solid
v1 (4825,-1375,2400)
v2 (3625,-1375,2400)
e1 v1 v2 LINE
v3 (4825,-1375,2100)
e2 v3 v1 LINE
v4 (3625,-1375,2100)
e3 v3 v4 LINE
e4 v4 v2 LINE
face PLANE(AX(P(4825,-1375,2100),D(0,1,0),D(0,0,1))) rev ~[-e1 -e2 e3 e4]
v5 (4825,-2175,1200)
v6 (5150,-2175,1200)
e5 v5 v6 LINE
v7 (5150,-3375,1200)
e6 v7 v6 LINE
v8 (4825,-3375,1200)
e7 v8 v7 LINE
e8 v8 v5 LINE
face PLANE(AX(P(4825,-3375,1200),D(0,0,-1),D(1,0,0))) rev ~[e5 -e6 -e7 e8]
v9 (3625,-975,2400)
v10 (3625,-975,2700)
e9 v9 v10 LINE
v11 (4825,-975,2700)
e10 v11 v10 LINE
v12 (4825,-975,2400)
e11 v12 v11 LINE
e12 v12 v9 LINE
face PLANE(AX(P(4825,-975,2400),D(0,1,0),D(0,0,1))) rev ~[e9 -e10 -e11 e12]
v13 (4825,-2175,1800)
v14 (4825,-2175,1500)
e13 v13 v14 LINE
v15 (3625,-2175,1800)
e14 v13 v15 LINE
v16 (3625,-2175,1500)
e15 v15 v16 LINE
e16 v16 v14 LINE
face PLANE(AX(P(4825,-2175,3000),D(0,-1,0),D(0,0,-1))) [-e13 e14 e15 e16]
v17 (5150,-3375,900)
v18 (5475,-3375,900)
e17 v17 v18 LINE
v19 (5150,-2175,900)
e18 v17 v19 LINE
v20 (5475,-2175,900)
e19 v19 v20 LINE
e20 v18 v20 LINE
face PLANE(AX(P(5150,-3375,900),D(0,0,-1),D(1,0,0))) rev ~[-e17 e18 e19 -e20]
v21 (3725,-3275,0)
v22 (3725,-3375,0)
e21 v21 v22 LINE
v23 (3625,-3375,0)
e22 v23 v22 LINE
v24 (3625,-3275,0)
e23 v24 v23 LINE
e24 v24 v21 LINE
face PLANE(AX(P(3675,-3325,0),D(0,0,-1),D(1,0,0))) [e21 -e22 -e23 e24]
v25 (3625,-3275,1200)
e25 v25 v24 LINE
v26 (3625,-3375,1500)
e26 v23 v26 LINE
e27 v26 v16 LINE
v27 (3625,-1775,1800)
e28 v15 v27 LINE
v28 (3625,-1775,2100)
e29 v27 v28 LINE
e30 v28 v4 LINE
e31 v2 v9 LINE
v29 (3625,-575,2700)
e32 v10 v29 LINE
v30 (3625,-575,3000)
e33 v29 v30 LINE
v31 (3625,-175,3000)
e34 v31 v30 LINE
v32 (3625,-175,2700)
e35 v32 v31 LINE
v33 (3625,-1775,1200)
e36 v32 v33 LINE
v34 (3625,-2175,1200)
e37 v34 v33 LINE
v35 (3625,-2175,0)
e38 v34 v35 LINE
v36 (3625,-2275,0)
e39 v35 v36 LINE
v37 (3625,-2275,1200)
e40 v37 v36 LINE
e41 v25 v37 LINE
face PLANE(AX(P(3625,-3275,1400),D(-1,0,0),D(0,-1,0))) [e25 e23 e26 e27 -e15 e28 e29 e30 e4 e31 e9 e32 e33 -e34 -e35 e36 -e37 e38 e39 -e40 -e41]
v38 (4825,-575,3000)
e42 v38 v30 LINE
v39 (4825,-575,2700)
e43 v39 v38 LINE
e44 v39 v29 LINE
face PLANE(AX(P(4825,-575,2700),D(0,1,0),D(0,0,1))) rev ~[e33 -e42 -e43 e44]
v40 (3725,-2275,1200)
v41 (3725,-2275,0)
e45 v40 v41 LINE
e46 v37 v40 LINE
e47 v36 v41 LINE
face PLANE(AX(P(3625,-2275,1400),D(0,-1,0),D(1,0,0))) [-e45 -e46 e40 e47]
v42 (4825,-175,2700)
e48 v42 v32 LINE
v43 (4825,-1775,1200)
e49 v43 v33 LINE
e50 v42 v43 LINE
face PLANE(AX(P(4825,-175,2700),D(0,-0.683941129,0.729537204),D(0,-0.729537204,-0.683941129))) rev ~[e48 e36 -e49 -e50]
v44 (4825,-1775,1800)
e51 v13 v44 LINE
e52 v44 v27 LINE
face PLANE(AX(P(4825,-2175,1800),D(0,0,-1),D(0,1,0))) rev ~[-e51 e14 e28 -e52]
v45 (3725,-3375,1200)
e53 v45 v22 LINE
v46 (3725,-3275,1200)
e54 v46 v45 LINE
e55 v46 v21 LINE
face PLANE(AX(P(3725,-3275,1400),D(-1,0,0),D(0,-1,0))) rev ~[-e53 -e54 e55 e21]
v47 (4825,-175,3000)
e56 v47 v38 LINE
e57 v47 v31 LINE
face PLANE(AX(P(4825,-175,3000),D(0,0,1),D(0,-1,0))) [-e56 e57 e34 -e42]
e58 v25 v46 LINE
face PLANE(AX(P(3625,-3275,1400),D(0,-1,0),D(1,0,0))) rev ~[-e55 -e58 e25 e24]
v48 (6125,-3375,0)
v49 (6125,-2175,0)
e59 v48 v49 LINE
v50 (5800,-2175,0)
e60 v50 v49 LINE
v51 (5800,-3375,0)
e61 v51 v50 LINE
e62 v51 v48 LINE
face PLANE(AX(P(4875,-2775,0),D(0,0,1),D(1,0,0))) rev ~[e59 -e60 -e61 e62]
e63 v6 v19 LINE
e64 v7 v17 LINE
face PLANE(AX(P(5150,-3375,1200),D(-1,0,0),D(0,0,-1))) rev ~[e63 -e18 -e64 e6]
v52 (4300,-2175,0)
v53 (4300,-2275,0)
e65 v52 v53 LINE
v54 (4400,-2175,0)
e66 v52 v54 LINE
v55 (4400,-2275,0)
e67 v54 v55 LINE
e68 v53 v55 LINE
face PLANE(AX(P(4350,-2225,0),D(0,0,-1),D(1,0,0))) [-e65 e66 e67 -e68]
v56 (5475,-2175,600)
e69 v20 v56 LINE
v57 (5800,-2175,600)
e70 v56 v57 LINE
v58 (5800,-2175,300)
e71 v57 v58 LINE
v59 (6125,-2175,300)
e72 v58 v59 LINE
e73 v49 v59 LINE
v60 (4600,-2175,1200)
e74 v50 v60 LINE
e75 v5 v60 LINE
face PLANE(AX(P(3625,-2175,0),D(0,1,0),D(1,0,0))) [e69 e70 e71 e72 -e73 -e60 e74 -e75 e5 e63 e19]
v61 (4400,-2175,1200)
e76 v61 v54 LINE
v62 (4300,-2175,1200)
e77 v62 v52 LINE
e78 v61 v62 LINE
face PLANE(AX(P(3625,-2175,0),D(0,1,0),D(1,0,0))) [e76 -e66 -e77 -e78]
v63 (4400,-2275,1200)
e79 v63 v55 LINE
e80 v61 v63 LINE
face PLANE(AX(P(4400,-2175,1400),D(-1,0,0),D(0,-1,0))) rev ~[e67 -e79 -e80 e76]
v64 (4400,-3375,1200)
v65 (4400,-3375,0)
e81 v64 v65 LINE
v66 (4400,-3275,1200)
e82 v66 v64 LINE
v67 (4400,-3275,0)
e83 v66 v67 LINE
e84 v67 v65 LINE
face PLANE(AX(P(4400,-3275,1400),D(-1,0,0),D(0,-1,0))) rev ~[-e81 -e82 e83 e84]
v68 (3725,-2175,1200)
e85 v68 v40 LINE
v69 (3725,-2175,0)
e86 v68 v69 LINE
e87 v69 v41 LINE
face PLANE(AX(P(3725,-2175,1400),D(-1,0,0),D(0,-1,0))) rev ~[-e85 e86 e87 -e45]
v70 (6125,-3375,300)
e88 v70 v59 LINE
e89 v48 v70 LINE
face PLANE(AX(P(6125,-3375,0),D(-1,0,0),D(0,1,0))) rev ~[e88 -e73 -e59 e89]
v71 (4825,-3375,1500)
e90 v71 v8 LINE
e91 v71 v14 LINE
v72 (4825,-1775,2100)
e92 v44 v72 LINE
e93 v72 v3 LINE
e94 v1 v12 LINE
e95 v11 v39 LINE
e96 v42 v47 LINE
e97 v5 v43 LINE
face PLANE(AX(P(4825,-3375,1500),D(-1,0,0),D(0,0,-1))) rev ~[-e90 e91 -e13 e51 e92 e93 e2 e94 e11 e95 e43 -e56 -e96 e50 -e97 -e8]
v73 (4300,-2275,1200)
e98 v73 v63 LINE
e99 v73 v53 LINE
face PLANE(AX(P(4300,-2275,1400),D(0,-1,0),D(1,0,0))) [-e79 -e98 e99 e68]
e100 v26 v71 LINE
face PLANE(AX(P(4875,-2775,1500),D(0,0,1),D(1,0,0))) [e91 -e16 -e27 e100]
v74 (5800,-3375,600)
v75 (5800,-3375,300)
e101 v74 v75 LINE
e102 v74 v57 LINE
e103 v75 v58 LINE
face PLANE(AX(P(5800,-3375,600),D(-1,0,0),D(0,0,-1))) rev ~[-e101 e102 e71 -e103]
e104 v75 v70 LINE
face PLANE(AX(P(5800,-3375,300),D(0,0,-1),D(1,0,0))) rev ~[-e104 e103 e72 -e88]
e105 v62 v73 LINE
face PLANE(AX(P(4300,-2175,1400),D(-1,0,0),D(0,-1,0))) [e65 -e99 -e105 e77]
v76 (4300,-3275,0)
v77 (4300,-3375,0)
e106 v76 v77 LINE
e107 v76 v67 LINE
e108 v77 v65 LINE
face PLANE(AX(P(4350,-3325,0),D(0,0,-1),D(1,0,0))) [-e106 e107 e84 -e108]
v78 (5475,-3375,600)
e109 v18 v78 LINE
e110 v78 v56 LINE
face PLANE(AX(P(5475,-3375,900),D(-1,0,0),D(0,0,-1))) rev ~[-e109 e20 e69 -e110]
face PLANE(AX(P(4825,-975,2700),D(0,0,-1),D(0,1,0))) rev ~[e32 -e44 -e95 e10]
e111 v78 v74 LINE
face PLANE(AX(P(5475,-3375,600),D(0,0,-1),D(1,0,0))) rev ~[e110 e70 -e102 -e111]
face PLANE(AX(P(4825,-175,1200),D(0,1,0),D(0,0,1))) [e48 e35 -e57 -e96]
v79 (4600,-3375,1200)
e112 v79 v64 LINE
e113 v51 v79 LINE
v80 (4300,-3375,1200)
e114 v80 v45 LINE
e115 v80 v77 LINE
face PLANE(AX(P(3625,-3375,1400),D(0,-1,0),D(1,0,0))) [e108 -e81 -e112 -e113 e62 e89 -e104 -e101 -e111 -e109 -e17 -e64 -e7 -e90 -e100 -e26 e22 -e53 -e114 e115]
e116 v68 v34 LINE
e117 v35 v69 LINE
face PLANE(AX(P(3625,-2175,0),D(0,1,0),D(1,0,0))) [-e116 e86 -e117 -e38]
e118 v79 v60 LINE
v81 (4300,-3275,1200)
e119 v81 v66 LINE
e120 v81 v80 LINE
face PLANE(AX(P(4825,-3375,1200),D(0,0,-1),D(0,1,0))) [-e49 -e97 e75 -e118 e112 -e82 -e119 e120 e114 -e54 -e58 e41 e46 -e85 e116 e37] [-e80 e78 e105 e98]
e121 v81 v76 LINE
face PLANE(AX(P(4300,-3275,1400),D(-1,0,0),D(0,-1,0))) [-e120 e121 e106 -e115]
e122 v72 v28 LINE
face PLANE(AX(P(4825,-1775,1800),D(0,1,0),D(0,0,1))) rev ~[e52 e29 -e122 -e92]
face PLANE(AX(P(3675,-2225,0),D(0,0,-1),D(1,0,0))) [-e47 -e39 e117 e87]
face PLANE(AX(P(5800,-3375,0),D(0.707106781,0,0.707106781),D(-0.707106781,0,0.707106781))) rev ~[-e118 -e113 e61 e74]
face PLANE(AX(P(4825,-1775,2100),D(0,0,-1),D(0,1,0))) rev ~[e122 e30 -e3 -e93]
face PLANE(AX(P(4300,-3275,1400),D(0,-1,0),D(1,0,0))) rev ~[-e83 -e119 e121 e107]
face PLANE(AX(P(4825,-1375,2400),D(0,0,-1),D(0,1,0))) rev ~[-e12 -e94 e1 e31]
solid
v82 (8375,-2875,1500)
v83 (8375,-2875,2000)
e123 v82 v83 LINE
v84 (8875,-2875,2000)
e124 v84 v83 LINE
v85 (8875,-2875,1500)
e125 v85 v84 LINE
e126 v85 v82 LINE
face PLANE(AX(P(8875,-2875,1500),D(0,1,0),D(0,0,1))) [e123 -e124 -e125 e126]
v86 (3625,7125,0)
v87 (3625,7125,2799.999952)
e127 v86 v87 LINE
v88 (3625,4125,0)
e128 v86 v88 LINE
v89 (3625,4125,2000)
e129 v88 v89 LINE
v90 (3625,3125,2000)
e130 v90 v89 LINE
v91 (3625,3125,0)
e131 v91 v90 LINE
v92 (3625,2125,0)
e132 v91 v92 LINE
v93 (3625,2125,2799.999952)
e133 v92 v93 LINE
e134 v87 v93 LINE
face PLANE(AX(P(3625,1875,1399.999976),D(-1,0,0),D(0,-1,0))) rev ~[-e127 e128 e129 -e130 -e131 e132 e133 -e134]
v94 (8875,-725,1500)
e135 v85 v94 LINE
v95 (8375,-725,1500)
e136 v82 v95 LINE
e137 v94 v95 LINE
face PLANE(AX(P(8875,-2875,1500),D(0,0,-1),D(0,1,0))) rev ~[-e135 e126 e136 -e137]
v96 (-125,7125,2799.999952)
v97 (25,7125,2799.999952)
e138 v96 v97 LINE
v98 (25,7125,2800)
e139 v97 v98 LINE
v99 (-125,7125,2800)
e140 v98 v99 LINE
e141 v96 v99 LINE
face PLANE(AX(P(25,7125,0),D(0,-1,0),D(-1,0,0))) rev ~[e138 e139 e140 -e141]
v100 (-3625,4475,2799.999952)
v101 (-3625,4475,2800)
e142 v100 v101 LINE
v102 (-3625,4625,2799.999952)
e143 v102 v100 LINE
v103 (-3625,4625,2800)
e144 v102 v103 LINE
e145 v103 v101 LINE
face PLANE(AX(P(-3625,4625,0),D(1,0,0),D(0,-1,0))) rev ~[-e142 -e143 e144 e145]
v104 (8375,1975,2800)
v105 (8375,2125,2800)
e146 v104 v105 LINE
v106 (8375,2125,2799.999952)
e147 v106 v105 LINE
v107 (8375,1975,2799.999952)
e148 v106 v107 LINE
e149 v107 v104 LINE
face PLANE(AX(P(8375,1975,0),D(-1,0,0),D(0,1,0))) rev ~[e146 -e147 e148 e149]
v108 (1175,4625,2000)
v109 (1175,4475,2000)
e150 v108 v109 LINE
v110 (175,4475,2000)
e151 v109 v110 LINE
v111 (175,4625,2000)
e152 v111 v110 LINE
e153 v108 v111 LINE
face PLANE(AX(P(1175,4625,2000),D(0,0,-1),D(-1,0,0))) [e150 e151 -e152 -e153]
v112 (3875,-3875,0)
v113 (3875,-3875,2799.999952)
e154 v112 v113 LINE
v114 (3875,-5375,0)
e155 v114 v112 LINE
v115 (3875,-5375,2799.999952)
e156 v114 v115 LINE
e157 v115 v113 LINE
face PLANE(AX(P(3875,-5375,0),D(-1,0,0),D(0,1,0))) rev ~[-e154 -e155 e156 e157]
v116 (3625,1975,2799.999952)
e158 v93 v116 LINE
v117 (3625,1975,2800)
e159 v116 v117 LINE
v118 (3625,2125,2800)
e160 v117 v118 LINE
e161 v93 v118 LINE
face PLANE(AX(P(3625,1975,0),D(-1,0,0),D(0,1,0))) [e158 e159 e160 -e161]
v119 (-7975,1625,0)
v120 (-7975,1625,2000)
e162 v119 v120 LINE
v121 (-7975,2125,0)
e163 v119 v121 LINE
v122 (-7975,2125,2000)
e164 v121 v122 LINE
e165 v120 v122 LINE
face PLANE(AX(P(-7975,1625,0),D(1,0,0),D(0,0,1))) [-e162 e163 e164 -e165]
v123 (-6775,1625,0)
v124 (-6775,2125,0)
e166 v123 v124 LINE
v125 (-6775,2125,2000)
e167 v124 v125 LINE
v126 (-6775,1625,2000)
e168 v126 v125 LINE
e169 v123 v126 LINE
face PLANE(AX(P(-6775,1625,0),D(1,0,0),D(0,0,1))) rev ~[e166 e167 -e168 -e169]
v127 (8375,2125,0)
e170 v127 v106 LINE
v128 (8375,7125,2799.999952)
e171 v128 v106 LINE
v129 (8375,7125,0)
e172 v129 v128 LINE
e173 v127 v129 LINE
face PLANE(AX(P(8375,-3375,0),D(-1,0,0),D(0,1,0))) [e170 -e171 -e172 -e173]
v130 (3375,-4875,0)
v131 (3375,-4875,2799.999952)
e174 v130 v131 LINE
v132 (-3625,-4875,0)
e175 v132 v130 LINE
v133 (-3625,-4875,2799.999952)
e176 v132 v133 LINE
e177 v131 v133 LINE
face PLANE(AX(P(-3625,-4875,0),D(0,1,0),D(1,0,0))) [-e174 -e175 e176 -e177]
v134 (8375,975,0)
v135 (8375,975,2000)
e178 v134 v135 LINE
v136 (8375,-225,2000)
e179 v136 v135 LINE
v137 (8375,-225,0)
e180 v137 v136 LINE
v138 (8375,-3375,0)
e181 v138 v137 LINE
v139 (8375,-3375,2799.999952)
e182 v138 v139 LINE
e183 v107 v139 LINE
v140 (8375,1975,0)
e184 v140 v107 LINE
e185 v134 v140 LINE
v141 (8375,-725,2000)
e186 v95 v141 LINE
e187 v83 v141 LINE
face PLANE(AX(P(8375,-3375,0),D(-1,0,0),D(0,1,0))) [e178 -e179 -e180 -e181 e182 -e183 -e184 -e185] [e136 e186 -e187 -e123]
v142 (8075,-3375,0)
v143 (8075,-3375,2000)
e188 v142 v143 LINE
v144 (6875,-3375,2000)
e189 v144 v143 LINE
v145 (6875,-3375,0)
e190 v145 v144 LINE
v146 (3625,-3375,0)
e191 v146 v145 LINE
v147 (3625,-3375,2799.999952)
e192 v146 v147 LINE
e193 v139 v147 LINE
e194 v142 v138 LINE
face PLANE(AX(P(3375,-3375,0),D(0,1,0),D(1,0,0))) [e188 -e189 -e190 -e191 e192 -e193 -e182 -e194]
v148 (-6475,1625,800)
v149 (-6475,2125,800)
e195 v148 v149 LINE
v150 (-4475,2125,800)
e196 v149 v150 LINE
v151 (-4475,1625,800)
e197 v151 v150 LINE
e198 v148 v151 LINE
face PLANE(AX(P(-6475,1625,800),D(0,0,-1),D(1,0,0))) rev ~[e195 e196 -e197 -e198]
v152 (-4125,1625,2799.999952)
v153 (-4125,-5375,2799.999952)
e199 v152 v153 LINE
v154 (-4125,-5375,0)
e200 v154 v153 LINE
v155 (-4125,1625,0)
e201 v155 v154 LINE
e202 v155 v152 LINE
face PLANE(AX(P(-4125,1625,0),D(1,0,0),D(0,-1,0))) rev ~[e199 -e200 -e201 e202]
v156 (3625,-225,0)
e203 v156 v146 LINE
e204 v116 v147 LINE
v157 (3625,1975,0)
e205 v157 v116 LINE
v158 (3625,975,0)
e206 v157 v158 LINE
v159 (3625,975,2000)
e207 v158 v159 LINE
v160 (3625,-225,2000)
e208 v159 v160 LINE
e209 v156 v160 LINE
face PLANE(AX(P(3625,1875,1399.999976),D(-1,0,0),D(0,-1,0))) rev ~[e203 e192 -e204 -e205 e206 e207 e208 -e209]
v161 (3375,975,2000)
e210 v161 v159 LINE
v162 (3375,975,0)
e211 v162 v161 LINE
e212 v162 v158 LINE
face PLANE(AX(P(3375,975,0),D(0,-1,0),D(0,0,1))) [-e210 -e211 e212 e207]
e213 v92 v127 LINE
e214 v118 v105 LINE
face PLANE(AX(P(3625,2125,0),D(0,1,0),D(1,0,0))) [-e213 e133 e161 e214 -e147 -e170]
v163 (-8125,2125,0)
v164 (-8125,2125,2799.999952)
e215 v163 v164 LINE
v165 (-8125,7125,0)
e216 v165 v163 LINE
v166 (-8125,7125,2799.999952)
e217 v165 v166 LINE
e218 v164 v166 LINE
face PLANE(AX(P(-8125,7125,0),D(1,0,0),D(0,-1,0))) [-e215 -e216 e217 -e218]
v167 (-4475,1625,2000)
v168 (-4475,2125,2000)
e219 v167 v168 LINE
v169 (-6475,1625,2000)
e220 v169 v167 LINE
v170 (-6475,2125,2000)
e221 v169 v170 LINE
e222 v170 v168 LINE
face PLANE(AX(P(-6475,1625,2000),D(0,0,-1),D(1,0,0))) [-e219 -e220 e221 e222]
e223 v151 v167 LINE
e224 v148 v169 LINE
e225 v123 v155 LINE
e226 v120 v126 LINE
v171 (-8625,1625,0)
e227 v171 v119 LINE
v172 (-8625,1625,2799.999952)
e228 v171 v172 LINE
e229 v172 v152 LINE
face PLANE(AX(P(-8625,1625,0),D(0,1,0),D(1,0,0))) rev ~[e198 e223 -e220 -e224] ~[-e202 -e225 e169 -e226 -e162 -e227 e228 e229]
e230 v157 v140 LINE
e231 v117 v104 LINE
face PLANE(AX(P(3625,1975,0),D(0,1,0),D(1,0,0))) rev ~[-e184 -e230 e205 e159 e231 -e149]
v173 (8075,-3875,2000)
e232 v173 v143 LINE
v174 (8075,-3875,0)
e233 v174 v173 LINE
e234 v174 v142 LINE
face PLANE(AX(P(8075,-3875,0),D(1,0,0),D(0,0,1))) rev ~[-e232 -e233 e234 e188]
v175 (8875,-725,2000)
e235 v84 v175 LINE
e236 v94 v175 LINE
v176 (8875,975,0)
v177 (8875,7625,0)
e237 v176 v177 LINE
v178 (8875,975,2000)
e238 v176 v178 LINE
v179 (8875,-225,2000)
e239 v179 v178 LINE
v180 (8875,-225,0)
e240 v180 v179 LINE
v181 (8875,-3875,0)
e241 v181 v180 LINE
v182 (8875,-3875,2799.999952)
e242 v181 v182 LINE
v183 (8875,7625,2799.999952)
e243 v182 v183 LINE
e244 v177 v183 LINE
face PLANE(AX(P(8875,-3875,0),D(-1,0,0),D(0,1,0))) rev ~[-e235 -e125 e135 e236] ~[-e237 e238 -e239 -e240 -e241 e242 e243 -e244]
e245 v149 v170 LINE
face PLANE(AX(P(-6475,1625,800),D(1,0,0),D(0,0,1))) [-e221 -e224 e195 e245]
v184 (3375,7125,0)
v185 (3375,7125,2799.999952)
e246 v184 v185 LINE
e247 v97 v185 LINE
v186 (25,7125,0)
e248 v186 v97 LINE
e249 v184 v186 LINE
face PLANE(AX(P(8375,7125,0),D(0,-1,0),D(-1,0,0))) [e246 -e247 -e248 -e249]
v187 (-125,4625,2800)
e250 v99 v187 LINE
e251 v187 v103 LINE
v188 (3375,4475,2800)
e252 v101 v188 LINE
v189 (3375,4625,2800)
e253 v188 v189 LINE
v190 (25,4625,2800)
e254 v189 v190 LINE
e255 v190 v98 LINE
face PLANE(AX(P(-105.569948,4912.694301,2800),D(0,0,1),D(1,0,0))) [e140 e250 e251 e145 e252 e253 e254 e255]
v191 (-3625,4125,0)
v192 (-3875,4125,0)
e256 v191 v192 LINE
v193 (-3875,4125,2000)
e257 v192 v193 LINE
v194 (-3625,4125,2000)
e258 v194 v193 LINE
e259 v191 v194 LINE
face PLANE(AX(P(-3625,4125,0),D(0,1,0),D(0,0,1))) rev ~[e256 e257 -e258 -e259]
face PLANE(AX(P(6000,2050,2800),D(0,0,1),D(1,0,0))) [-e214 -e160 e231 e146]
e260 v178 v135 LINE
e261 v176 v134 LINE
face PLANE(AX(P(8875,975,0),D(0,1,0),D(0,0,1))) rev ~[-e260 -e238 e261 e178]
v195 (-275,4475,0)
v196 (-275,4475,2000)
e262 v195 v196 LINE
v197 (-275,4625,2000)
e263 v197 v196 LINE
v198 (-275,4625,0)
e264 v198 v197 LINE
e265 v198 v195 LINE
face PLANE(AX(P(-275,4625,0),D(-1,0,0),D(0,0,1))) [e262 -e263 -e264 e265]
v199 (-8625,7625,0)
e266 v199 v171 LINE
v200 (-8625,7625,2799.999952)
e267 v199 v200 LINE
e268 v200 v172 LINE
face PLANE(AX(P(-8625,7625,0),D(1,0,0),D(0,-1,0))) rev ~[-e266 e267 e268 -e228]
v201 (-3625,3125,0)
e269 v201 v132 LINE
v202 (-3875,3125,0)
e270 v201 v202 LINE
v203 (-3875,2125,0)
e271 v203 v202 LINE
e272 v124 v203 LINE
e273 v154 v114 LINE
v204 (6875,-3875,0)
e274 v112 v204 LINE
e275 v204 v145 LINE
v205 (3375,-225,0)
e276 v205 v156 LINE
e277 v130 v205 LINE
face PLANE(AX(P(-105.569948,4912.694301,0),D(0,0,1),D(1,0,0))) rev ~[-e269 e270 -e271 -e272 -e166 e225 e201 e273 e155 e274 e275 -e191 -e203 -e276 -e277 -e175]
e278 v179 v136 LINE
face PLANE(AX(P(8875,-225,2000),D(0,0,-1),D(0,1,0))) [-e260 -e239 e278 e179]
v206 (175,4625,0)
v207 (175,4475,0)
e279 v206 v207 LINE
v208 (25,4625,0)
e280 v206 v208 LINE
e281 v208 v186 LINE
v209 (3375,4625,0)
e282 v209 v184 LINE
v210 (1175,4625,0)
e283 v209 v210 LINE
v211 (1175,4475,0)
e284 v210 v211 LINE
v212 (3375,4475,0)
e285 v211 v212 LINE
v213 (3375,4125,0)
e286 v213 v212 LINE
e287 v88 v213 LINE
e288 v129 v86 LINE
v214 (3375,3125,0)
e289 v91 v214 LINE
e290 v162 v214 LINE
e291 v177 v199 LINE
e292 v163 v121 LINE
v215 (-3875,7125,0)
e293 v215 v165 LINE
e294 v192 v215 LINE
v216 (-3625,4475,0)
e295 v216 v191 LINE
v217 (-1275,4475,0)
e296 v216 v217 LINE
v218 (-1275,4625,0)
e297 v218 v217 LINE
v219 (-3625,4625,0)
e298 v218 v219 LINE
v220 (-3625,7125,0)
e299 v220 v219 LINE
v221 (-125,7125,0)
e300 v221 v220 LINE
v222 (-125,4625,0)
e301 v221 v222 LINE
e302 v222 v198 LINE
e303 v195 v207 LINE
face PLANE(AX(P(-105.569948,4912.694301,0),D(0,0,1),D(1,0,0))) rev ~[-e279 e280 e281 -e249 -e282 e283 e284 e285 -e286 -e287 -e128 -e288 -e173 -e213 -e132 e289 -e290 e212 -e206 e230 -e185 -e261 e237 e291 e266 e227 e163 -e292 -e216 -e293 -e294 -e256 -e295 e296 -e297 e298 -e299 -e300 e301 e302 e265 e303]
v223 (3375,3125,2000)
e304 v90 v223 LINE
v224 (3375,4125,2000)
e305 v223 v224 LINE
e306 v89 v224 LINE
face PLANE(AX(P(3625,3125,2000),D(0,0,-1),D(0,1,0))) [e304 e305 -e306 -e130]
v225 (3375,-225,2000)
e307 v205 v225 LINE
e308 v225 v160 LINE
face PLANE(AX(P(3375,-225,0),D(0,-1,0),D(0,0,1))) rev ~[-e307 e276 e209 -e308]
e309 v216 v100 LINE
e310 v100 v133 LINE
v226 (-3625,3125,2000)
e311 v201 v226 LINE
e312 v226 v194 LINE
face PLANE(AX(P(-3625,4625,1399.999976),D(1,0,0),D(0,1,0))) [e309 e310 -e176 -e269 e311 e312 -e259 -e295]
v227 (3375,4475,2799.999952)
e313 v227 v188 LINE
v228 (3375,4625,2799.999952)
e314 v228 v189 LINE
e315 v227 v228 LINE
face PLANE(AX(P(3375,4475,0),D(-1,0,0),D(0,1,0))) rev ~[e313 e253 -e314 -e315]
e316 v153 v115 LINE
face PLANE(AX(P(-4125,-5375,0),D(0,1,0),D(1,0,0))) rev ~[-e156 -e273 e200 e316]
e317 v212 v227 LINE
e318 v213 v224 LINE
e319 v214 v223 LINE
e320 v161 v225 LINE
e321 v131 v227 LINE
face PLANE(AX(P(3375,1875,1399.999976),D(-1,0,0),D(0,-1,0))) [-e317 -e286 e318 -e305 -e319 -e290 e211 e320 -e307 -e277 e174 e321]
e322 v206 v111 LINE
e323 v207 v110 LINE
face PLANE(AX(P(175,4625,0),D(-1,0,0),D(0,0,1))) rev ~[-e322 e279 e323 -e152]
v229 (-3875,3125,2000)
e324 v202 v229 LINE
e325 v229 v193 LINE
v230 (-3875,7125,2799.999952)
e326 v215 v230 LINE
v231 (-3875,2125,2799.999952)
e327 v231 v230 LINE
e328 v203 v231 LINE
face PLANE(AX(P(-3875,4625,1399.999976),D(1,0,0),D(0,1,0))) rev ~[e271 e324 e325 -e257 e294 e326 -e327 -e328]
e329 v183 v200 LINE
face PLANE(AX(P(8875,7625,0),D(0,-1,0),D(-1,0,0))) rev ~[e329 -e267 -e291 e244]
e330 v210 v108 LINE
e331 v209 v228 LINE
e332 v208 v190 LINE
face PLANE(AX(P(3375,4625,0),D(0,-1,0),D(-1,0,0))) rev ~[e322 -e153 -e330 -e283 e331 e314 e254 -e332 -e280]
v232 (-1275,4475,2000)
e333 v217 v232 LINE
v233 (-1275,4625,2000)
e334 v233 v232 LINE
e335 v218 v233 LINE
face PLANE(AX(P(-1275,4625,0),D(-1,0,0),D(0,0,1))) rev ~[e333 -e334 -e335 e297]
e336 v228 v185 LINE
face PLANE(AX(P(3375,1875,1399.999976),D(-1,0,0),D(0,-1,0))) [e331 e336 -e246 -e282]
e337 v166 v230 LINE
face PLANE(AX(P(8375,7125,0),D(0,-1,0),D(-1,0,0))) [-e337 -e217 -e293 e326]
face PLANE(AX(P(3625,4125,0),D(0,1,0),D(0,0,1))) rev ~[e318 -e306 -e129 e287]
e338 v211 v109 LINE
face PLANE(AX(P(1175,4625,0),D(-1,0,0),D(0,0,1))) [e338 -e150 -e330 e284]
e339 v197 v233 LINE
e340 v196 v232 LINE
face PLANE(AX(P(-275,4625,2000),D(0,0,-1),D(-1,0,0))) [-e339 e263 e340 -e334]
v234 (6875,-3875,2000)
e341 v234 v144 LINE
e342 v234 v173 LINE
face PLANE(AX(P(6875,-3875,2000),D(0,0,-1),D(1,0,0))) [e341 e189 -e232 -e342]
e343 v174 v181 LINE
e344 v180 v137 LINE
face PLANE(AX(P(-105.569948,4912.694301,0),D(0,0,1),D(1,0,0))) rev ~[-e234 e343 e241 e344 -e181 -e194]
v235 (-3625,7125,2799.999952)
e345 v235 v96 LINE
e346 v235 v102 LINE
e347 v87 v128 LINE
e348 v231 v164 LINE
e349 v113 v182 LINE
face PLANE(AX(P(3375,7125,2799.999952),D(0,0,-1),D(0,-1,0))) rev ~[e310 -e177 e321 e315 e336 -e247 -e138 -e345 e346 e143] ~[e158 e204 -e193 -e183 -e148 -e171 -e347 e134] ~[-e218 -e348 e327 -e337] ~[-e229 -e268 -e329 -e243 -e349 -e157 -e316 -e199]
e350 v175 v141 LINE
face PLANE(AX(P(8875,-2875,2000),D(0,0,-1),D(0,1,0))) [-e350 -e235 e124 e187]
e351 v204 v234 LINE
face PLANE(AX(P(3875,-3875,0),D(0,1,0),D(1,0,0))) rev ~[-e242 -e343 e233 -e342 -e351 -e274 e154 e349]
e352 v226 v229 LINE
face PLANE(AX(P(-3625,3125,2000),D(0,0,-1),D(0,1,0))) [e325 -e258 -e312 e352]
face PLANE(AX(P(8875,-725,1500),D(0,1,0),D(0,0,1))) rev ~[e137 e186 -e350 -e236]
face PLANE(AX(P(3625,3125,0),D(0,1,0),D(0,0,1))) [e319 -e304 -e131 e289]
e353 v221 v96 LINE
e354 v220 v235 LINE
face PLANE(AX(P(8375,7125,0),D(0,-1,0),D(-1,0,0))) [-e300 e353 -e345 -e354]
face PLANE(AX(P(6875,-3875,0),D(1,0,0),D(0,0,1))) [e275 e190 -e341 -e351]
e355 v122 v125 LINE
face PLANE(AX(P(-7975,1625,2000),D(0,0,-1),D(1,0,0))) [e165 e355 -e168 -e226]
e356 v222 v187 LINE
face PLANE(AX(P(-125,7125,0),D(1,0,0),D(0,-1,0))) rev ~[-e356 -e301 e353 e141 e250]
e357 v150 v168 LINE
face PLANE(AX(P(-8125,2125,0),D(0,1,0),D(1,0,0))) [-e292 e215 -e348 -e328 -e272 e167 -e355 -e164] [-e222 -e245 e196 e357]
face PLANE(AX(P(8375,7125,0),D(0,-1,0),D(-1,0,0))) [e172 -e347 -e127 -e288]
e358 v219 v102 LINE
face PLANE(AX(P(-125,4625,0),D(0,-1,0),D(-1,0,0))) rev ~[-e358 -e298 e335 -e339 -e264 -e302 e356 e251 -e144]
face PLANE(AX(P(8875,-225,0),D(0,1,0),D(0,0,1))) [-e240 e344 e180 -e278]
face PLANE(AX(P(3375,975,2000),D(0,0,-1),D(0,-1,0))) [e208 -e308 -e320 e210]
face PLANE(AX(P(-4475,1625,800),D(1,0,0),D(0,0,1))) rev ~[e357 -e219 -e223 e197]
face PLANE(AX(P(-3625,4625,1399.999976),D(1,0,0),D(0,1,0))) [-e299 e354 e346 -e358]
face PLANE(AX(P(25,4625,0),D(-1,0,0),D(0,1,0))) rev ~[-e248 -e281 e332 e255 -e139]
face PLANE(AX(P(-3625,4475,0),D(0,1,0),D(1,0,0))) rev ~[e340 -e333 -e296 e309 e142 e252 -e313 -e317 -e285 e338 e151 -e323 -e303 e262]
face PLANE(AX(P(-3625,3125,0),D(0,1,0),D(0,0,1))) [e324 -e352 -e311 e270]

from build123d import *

# Parameters (mm, degrees)
F1_DEPTH  = 2799.9999523163
F3_DEPTH  = 3000
F4_W      = 5000
F4_H      = 2799.9999523163
F5_DEPTH  = 250
F6_W      = 1000
F6_H      = 2000
F7_DEPTH  = 250
F8_W      = 1200
F8_H      = 2000
F9_DEPTH  = 500
F10_W     = 2000
F10_H     = 1200
F11_DEPTH = 500
F12_W     = 10500
F12_H     = 2799.9999523163
F13_DEPTH = 250
F14_W     = 4750
F14_H     = 150
F15_DEPTH = 2800
F16_W     = 1000
F16_H     = 2000
F17_DEPTH = 150
F18_W     = 1000
F18_H     = 2000
F19_DEPTH = 150
F20_W     = 1000
F20_H     = 2000
F21_DEPTH = 250
F22_W     = 1200
F22_H     = 2000
F23_DEPTH = 500
F24_W     = 1200
F24_H     = 2000
F25_DEPTH = 500
F26_W     = 2150
F26_H     = 500
F27_DEPTH = 500
F28_W     = 1200
F28_H     = 2000
F29_DEPTH = 250
F30_W     = 2500
F30_H     = 1200
F31_DEPTH = 1500
F33_DEPTH = 1200
F34_W     = 100
F34_H     = 100
F35_DEPTH = 1400
F36_W     = 1200
F36_H     = 300
F37_DEPTH = 1200
F39_DEPTH = 1200


with BuildPart() as f1:
    # F0 (on Top) → F1 (new body)
    with BuildSketch(Plane.XY):
        Polygon((8875, -3875), (8875, 7625), (-8625, 7625), (-8625, 1625), (-4125, 1625), (-4125, -5375), (3875, -5375), (3875, -3875), align=None)
    extrude(amount=F1_DEPTH)

    # F2 (on Top) → F3 (cut)
    with BuildSketch(Plane.XY):
        Polygon((8375, -3375), (8375, 7125), (-3740.2497768402, 7125), (-8125, 7125), (-8125, 2125), (-3625, 2125), (-3625, -4875), (3375, -4875), (3375, -3375), align=None)
    extrude(amount=F3_DEPTH, mode=Mode.SUBTRACT)

    # F4 (on face) → F5 (join)
    with BuildSketch(Plane.YZ.offset(-3625)):
        with Locations((4625, 1399.9999761581)):
            Rectangle(F4_W, F4_H)
    extrude(amount=-F5_DEPTH)

    # F6 (on face) → F7 (cut, through all)
    with BuildSketch(Plane.YZ.offset(-3625)):
        with Locations((3625, 1000)):
            Rectangle(F6_W, F6_H)
    extrude(amount=-F7_DEPTH, mode=Mode.SUBTRACT)

    # F8 (on face) → F9 (cut, through all)
    with BuildSketch(Plane.XZ.offset(-1625)):
        with Locations((-7375, 1000)):
            Rectangle(F8_W, F8_H)
    extrude(amount=-F9_DEPTH, mode=Mode.SUBTRACT)

    # F10 (on face) → F11 (cut, through all)
    with BuildSketch(Plane.XZ.offset(-1625)):
        with Locations((-5475, 1400)):
            Rectangle(F10_W, F10_H)
    extrude(amount=-F11_DEPTH, mode=Mode.SUBTRACT)

    # F12 (on face) → F13 (join)
    with BuildSketch(Plane(origin=(3375, 0, 0), x_dir=(0, -1, 0), z_dir=(-1, 0, 0))):
        with Locations((-1875, 1399.9999761581)):
            Rectangle(F12_W, F12_H)
    extrude(amount=-F13_DEPTH)

    # F14 (on face) → F15 (join)
    with BuildSketch(Plane.XY):
        Polygon((3375, 4475), (3375, 4625), (25, 4625), (25, 7125), (-125, 7125), (-125, 4625), (-3625, 4625), (-3625, 4475), align=None)
        with Locations((6000, 2050)):
            Rectangle(F14_W, F14_H)
    extrude(amount=F15_DEPTH)

    # F16 (on face) → F17 (cut, through all)
    with BuildSketch(Plane(origin=(0, 4625, 0), x_dir=(-1, 0, 0), z_dir=(0, 1, 0))):
        with Locations((775, 1000)):
            Rectangle(F16_W, F16_H)
    extrude(amount=-F17_DEPTH, mode=Mode.SUBTRACT)

    # F18 (on face) → F19 (cut, through all)
    with BuildSketch(Plane(origin=(0, 4625, 0), x_dir=(-1, 0, 0), z_dir=(0, 1, 0))):
        with Locations((-675, 1000)):
            Rectangle(F18_W, F18_H)
    extrude(amount=-F19_DEPTH, mode=Mode.SUBTRACT)

    # F20 (on face) → F21 (cut, through all)
    with BuildSketch(Plane.YZ.offset(3625)):
        with Locations((3625, 1000)):
            Rectangle(F20_W, F20_H)
    extrude(amount=-F21_DEPTH, mode=Mode.SUBTRACT)

    # F22 (on face) → F23 (cut, through all)
    with BuildSketch(Plane.XZ.offset(3875)):
        with Locations((7475, 1000)):
            Rectangle(F22_W, F22_H)
    extrude(amount=-F23_DEPTH, mode=Mode.SUBTRACT)

    # F24 (on face) → F25 (cut, through all)
    with BuildSketch(Plane.YZ.offset(8875)):
        with Locations((375, 1000)):
            Rectangle(F24_W, F24_H)
    extrude(amount=-F25_DEPTH, mode=Mode.SUBTRACT)

    # F26 (on face) → F27 (cut, through all)
    with BuildSketch(Plane.YZ.offset(8875)):
        with Locations((-1800, 1750)):
            Rectangle(F26_W, F26_H)
    extrude(amount=-F27_DEPTH, mode=Mode.SUBTRACT)

    # F28 (on face) → F29 (cut, through all)
    with BuildSketch(Plane(origin=(3375, 0, 0), x_dir=(0, -1, 0), z_dir=(-1, 0, 0))):
        with Locations((-375, 1000)):
            Rectangle(F28_W, F28_H)
    extrude(amount=-F29_DEPTH, mode=Mode.SUBTRACT)


with BuildPart() as f31:
    # F30 (on face) → F31 (new body)
    with BuildSketch(Plane.XY):
        with Locations((4875, -2775)):
            Rectangle(F30_W, F30_H)
    extrude(amount=F31_DEPTH)

    # F32 (on face) → F33 (cut, through all)
    with BuildSketch(Plane.XZ.offset(3375)):
        Polygon((6125, 300), (6125, 1500), (4825, 1500), (4825, 1200), (5150, 1200), (5150, 900), (5475, 900), (5475, 600), (5800, 600), (5800, 300), align=None)
        Polygon((3625, 1400), (3625, 0), (5800, 0), (4400, 1400), align=None)
    extrude(amount=-F33_DEPTH, mode=Mode.SUBTRACT)

    # F34 (on face) → F35 (join)
    with BuildSketch(Plane(origin=(0, 0, 1400), x_dir=(1, 0, 0), z_dir=(0, 0, -1))):
        with Locations((3675, 3325)):
            Rectangle(F34_W, F34_H)
        with Locations((3675, 2225)):
            Rectangle(F34_W, F34_H)
        with Locations((4350, 2225)):
            Rectangle(F34_W, F34_H)
        with Locations((4350, 3325)):
            Rectangle(F34_W, F34_H)
    extrude(amount=F35_DEPTH)

    # F36 (on face) → F37 (join)
    with BuildSketch(Plane.YZ.offset(4825)):
        with Locations((-2775, 1350)):
            Rectangle(F36_W, F36_H)
        Polygon((-2175, 1500), (-2175, 1200), (-175, 1200), (-175, 3000), (-2175, 3000), align=None)
    extrude(amount=-F37_DEPTH)

    # F38 (on face) → F39 (cut)
    with BuildSketch(Plane.YZ.offset(4825)):
        Polygon((-575, 3000), (-2175, 3000), (-2175, 1800), (-1775, 1800), (-1775, 2100), (-1375, 2100), (-1375, 2400), (-975, 2400), (-975, 2700), (-575, 2700), align=None)
        Polygon((-1775, 1200), (-175, 1200), (-175, 2700), align=None)
    extrude(amount=-F39_DEPTH, mode=Mode.SUBTRACT)


solid = Compound([f1.part, f31.part])
